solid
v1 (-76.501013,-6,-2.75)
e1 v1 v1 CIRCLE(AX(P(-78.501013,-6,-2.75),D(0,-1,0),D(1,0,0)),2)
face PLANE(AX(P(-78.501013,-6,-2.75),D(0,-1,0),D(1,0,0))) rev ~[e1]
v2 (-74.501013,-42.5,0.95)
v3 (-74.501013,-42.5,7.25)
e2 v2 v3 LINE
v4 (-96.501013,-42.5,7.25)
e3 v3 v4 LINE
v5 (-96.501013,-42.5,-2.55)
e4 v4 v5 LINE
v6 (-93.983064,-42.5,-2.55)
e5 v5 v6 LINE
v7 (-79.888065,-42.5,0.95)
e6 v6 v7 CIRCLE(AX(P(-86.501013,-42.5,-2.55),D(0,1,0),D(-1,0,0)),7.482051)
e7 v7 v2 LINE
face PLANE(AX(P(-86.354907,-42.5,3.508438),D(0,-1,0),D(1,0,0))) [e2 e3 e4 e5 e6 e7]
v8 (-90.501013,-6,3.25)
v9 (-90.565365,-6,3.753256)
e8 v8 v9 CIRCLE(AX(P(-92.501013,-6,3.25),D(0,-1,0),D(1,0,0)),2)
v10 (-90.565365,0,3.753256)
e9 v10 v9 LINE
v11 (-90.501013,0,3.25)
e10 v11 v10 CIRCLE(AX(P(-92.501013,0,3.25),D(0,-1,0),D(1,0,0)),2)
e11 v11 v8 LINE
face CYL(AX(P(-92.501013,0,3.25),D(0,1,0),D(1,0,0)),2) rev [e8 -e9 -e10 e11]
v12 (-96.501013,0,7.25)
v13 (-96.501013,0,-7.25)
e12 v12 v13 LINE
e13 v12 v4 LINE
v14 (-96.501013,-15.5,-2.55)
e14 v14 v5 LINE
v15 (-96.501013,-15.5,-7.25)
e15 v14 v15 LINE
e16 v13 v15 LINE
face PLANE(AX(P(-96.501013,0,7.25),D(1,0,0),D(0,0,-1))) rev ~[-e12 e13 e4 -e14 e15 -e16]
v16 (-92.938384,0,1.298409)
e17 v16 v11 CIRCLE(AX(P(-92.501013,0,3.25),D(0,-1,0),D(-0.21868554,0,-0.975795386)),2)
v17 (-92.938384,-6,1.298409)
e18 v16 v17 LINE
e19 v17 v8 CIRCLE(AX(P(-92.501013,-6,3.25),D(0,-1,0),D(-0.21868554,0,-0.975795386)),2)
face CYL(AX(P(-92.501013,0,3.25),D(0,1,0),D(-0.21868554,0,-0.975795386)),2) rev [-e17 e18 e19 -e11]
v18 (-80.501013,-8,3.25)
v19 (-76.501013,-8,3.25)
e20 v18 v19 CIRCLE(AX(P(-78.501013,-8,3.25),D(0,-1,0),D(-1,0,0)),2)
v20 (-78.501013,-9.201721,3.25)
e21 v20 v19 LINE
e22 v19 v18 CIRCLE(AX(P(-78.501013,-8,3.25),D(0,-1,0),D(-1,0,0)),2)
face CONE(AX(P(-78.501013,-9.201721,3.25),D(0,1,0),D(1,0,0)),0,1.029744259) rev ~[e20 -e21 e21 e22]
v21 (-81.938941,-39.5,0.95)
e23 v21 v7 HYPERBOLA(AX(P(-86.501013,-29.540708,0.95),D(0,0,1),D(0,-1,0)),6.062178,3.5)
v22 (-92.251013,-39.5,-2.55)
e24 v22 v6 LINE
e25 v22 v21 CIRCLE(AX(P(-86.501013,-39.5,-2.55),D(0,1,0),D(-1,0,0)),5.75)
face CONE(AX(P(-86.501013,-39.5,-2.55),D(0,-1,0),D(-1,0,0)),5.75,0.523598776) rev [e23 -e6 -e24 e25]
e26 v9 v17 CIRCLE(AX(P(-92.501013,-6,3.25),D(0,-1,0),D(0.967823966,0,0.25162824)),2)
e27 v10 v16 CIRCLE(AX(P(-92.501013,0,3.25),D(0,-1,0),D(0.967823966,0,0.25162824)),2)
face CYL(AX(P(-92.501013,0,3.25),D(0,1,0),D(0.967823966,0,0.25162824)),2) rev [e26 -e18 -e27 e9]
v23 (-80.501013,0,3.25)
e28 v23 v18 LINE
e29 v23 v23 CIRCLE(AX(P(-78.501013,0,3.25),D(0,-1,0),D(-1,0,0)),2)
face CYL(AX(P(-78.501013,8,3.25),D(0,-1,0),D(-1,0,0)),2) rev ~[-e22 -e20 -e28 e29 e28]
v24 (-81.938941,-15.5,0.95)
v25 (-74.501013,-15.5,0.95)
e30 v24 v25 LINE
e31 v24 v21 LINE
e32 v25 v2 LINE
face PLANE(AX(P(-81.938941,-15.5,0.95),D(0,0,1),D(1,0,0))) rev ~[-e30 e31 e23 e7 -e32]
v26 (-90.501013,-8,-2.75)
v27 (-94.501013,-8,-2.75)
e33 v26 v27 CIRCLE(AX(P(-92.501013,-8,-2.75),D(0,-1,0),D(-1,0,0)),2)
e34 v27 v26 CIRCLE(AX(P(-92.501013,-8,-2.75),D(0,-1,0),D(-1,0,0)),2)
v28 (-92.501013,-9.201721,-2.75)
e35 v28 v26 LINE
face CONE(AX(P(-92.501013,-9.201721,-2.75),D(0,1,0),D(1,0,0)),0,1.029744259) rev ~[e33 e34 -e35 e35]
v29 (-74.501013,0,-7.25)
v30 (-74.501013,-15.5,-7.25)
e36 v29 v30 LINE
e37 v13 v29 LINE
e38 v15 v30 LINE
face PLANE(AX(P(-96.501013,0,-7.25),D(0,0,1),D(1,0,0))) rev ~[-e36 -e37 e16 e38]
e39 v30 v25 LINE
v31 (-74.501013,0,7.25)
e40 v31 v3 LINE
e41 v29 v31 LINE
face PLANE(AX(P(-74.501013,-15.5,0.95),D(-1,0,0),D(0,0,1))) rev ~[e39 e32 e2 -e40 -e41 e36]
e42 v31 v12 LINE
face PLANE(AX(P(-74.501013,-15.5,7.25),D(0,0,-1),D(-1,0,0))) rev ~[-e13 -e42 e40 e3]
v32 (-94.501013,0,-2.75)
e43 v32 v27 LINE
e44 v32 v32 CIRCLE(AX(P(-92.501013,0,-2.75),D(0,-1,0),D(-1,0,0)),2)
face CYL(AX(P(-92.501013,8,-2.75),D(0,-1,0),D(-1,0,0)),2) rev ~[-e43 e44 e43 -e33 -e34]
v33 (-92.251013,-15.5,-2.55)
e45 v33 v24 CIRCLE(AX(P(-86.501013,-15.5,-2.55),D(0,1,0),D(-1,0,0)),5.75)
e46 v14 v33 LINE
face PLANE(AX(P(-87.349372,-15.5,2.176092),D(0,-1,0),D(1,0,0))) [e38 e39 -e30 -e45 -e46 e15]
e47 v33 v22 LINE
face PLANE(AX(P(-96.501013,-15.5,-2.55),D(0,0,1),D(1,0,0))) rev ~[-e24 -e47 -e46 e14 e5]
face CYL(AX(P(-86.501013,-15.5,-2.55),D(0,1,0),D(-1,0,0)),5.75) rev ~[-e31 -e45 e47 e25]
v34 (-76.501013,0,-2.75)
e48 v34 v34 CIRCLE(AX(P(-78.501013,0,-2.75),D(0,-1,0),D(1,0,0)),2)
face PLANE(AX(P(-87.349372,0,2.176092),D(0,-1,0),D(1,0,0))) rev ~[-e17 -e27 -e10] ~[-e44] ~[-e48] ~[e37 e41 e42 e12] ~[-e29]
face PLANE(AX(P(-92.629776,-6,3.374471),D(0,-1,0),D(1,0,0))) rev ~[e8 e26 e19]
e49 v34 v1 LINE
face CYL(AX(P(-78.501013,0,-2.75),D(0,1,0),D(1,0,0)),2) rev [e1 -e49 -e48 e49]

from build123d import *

# Parameters (mm, degrees)
F0_R     = 1.62
F0_R_2   = 2
F1_DEPTH = 15.5
F3_DEPTH = 27
F4_D     = 4
F4_DEPTH = 8
F4_TIP   = 1.2017212381
F5_DEPTH = 6
F6_SIZE2 = 1.7320508076
F6_SIZE  = 3


# Not quite as in the source:
# - ends of sketch curves that miss each other by under 0.0002 mm in the source are joined


with BuildPart() as f1:
    # F0 (on Front) → F1 (new body)
    with BuildSketch(Plane.XZ):
        with BuildLine():
            Line((-81.938941, 0.95), (-79.867763328, 0.95))
            ThreePointArc((-79.867763328, 0.95), (-84.599863166, 4.7050416476), (-90.5653650686, 3.7532564808))
            ThreePointArc((-90.5653650686, 3.7532564808), (-90.517166249, 3.503677095), (-90.501013, 3.25))
            ThreePointArc((-90.501013, 3.25), (-91.2509614327, 1.6887917887), (-92.9383840791, 1.2984092286))
            ThreePointArc((-92.9383840791, 1.2984092286), (-93.5417590804, 0.0341622689), (-93.899505073, -1.3202378094))
            ThreePointArc((-93.899505073, -1.3202378094), (-93.0082544766, -0.8153925244), (-91.9839548989, -0.8179930331))
            ThreePointArc((-91.9839548989, -0.8179930331), (-87.4977327048, 3.112954161), (-81.938941, 0.95))
        make_face()
        with BuildLine():
            ThreePointArc((-90.5653650686, 3.7532564808), (-84.599863166, 4.7050416476), (-79.867763328, 0.9499998269))
            Line((-79.867763328, 0.9499998269), (-74.501013, 0.95))
            Line((-74.501013, 0.95), (-74.501013, 7.25))
            Line((-74.501013, 7.25), (-96.501013, 7.25))
            Line((-96.501013, 7.25), (-96.501013, -2.55))
            Line((-96.501013, -2.55), (-94.4909878742, -2.55))
            ThreePointArc((-94.4909878742, -2.55), (-94.3033741804, -1.8831123628), (-93.899505073, -1.3202378094))
            ThreePointArc((-93.899505073, -1.3202378094), (-93.5417590804, 0.0341622689), (-92.9383840791, 1.2984092286))
            ThreePointArc((-92.9383840791, 1.2984092286), (-93.9389897521, 4.6400441937), (-90.5653650686, 3.7532564808))
        make_face()
        with Locations((-78.501013, 3.25)):
            Circle(F0_R, mode=Mode.SUBTRACT)
        with BuildLine():
            Line((-74.501013, 0.95), (-79.867763328, 0.95))
            Line((-79.867763328, 0.95), (-81.938941, 0.95))
            ThreePointArc((-81.9389410644, 0.9499999506), (-87.4977327048, 3.112954161), (-91.9839548989, -0.8179930331))
            ThreePointArc((-91.9839548989, -0.8179930331), (-92.0381964068, -1.0001290636), (-92.086389397, -1.1839580887))
            ThreePointArc((-92.086389397, -1.1839580887), (-91.2172509043, -1.7618932843), (-90.881013, -2.75))
            ThreePointArc((-90.881013, -2.75), (-92.6012048017, -4.3668987609), (-94.1086199171, -2.55))
            Line((-94.1086199171, -2.55), (-94.4909878742, -2.55))
            Line((-94.4909878742, -2.55), (-96.501013, -2.55))
            Line((-96.501013, -2.55), (-96.501013, -7.25))
            Line((-96.501013, -7.25), (-74.501013, -7.25))
            Line((-74.501013, -7.25), (-74.501013, 0.95))
        make_face()
        with Locations((-78.501013, -2.75)):
            Circle(F0_R_2, mode=Mode.SUBTRACT)
        with BuildLine():
            ThreePointArc((-92.9383840791, 1.2984092286), (-91.8934258204, 2.6626657264), (-90.5653650686, 3.7532564808))
            ThreePointArc((-90.5653650686, 3.7532564808), (-93.9389897521, 4.6400441937), (-92.9383840791, 1.2984092286))
        make_face()
        with Locations((-78.501013, -2.75)):
            Circle(F0_R_2)
        with BuildLine():
            ThreePointArc((-90.501013, 3.25), (-90.517166249, 3.503677095), (-90.5653650686, 3.7532564808))
            ThreePointArc((-90.5653650686, 3.7532564808), (-91.8934258204, 2.6626657264), (-92.9383840791, 1.2984092286))
            ThreePointArc((-92.9383840791, 1.2984092286), (-91.2509614327, 1.6887917887), (-90.501013, 3.25))
        make_face()
        with Locations((-78.501013, 3.25)):
            Circle(F0_R)
        with BuildLine():
            ThreePointArc((-93.9879149105, -2.1069426863), (-93.9540972375, -1.7124229299), (-93.899505073, -1.3202378094))
            ThreePointArc((-93.899505073, -1.3202378094), (-94.3033741804, -1.8831123628), (-94.4909878742, -2.55))
            Line((-94.4909878742, -2.55), (-94.1086199171, -2.55))
            ThreePointArc((-94.1086199171, -2.55), (-94.0640456826, -2.324172766), (-93.9879149105, -2.1069426863))
        make_face()
        with BuildLine():
            ThreePointArc((-92.086389397, -1.1839580887), (-92.0381964068, -1.0001290636), (-91.9839548989, -0.8179930331))
            ThreePointArc((-91.9839548989, -0.8179930331), (-93.0082544766, -0.8153925244), (-93.899505073, -1.3202378094))
            ThreePointArc((-93.899505073, -1.3202378094), (-93.9540972375, -1.7124229299), (-93.9879149105, -2.1069426863))
            ThreePointArc((-93.9879149105, -2.1069426863), (-93.2084169398, -1.29261204), (-92.086389397, -1.1839580887))
        make_face()
        with BuildLine():
            ThreePointArc((-90.881013, -2.75), (-91.2172509043, -1.7618932843), (-92.086389397, -1.1839580887))
            ThreePointArc((-92.086389397, -1.1839580887), (-92.2097087478, -1.8620371678), (-92.251013, -2.55))
            Line((-92.251013, -2.55), (-94.001013, -2.55))
            Line((-94.001013, -2.55), (-94.1086199171, -2.55))
            ThreePointArc((-94.1086199171, -2.55), (-92.6012048017, -4.3668987609), (-90.881013, -2.75))
        make_face()
        with BuildLine():
            ThreePointArc((-92.251013, -2.55), (-92.2097087478, -1.8620371678), (-92.086389397, -1.1839580887))
            ThreePointArc((-92.086389397, -1.1839580887), (-93.2084169398, -1.29261204), (-93.9879149105, -2.1069426863))
            ThreePointArc((-93.9879149105, -2.1069426863), (-93.9977377625, -2.3283745597), (-94.001013, -2.55))
            Line((-94.001013, -2.55), (-92.251013, -2.55))
        make_face()
        with BuildLine():
            ThreePointArc((-94.001013, -2.55), (-93.9977377625, -2.3283745597), (-93.9879149105, -2.1069426863))
            ThreePointArc((-93.9879149105, -2.1069426863), (-94.0640456826, -2.324172766), (-94.1086199171, -2.55))
            Line((-94.1086199171, -2.55), (-94.001013, -2.55))
        make_face()
    extrude(amount=F1_DEPTH)

    # F2 (on face) → F3 (join)
    with BuildSketch(Plane.XZ.offset(15.5)):
        with BuildLine():
            Line((-81.938941, 0.95), (-74.501013, 0.95))
            Line((-74.501013, 0.95), (-74.501013, 7.25))
            Line((-74.501013, 7.25), (-96.501013, 7.25))
            Line((-96.501013, 7.25), (-96.501013, -2.55))
            Line((-96.501013, -2.55), (-92.251013, -2.55))
            ThreePointArc((-92.251013, -2.55), (-88.3490641857, 2.8949248677), (-81.9389410644, 0.9499999506))
        make_face()
    extrude(amount=F3_DEPTH)

    # F4
    with Locations(Plane(origin=(0, 0, 0), x_dir=(1, 0, 0), z_dir=(0, 1, 0))):
        with Locations((-92.501013, 2.75), (-78.501013, -3.25)):
            Hole(F4_D / 2, depth=F4_DEPTH)
            with Locations((0, 0, -(F4_DEPTH + F4_TIP / 2))):  # 118° drill point
                Cone(0, F4_D / 2, F4_TIP, mode=Mode.SUBTRACT)

    # F0 (on Front) → F5 (cut)
    with BuildSketch(Plane.XZ):
        with BuildLine():
            ThreePointArc((-92.9383840791, 1.2984092286), (-91.8934258204, 2.6626657264), (-90.5653650686, 3.7532564808))
            ThreePointArc((-90.5653650686, 3.7532564808), (-93.9389897521, 4.6400441937), (-92.9383840791, 1.2984092286))
        make_face()
        with BuildLine():
            ThreePointArc((-90.501013, 3.25), (-90.517166249, 3.503677095), (-90.5653650686, 3.7532564808))
            ThreePointArc((-90.5653650686, 3.7532564808), (-91.8934258204, 2.6626657264), (-92.9383840791, 1.2984092286))
            ThreePointArc((-92.9383840791, 1.2984092286), (-91.2509614327, 1.6887917887), (-90.501013, 3.25))
        make_face()
        with Locations((-78.501013, -2.75)):
            Circle(F0_R_2)
    extrude(amount=F5_DEPTH, mode=Mode.SUBTRACT)

    # F6
    f6_edges = [f1.edges().sort_by_distance(p)[0] for p in [
        (-88.349064, -42.5, 2.894925),
    ]]
    f6_side = f1.faces().sort_by_distance((-88.349064, -29, 2.894925))[0]
    chamfer(f6_edges, length=F6_SIZE, length2=F6_SIZE2, reference=f6_side)


solid = f1.part
